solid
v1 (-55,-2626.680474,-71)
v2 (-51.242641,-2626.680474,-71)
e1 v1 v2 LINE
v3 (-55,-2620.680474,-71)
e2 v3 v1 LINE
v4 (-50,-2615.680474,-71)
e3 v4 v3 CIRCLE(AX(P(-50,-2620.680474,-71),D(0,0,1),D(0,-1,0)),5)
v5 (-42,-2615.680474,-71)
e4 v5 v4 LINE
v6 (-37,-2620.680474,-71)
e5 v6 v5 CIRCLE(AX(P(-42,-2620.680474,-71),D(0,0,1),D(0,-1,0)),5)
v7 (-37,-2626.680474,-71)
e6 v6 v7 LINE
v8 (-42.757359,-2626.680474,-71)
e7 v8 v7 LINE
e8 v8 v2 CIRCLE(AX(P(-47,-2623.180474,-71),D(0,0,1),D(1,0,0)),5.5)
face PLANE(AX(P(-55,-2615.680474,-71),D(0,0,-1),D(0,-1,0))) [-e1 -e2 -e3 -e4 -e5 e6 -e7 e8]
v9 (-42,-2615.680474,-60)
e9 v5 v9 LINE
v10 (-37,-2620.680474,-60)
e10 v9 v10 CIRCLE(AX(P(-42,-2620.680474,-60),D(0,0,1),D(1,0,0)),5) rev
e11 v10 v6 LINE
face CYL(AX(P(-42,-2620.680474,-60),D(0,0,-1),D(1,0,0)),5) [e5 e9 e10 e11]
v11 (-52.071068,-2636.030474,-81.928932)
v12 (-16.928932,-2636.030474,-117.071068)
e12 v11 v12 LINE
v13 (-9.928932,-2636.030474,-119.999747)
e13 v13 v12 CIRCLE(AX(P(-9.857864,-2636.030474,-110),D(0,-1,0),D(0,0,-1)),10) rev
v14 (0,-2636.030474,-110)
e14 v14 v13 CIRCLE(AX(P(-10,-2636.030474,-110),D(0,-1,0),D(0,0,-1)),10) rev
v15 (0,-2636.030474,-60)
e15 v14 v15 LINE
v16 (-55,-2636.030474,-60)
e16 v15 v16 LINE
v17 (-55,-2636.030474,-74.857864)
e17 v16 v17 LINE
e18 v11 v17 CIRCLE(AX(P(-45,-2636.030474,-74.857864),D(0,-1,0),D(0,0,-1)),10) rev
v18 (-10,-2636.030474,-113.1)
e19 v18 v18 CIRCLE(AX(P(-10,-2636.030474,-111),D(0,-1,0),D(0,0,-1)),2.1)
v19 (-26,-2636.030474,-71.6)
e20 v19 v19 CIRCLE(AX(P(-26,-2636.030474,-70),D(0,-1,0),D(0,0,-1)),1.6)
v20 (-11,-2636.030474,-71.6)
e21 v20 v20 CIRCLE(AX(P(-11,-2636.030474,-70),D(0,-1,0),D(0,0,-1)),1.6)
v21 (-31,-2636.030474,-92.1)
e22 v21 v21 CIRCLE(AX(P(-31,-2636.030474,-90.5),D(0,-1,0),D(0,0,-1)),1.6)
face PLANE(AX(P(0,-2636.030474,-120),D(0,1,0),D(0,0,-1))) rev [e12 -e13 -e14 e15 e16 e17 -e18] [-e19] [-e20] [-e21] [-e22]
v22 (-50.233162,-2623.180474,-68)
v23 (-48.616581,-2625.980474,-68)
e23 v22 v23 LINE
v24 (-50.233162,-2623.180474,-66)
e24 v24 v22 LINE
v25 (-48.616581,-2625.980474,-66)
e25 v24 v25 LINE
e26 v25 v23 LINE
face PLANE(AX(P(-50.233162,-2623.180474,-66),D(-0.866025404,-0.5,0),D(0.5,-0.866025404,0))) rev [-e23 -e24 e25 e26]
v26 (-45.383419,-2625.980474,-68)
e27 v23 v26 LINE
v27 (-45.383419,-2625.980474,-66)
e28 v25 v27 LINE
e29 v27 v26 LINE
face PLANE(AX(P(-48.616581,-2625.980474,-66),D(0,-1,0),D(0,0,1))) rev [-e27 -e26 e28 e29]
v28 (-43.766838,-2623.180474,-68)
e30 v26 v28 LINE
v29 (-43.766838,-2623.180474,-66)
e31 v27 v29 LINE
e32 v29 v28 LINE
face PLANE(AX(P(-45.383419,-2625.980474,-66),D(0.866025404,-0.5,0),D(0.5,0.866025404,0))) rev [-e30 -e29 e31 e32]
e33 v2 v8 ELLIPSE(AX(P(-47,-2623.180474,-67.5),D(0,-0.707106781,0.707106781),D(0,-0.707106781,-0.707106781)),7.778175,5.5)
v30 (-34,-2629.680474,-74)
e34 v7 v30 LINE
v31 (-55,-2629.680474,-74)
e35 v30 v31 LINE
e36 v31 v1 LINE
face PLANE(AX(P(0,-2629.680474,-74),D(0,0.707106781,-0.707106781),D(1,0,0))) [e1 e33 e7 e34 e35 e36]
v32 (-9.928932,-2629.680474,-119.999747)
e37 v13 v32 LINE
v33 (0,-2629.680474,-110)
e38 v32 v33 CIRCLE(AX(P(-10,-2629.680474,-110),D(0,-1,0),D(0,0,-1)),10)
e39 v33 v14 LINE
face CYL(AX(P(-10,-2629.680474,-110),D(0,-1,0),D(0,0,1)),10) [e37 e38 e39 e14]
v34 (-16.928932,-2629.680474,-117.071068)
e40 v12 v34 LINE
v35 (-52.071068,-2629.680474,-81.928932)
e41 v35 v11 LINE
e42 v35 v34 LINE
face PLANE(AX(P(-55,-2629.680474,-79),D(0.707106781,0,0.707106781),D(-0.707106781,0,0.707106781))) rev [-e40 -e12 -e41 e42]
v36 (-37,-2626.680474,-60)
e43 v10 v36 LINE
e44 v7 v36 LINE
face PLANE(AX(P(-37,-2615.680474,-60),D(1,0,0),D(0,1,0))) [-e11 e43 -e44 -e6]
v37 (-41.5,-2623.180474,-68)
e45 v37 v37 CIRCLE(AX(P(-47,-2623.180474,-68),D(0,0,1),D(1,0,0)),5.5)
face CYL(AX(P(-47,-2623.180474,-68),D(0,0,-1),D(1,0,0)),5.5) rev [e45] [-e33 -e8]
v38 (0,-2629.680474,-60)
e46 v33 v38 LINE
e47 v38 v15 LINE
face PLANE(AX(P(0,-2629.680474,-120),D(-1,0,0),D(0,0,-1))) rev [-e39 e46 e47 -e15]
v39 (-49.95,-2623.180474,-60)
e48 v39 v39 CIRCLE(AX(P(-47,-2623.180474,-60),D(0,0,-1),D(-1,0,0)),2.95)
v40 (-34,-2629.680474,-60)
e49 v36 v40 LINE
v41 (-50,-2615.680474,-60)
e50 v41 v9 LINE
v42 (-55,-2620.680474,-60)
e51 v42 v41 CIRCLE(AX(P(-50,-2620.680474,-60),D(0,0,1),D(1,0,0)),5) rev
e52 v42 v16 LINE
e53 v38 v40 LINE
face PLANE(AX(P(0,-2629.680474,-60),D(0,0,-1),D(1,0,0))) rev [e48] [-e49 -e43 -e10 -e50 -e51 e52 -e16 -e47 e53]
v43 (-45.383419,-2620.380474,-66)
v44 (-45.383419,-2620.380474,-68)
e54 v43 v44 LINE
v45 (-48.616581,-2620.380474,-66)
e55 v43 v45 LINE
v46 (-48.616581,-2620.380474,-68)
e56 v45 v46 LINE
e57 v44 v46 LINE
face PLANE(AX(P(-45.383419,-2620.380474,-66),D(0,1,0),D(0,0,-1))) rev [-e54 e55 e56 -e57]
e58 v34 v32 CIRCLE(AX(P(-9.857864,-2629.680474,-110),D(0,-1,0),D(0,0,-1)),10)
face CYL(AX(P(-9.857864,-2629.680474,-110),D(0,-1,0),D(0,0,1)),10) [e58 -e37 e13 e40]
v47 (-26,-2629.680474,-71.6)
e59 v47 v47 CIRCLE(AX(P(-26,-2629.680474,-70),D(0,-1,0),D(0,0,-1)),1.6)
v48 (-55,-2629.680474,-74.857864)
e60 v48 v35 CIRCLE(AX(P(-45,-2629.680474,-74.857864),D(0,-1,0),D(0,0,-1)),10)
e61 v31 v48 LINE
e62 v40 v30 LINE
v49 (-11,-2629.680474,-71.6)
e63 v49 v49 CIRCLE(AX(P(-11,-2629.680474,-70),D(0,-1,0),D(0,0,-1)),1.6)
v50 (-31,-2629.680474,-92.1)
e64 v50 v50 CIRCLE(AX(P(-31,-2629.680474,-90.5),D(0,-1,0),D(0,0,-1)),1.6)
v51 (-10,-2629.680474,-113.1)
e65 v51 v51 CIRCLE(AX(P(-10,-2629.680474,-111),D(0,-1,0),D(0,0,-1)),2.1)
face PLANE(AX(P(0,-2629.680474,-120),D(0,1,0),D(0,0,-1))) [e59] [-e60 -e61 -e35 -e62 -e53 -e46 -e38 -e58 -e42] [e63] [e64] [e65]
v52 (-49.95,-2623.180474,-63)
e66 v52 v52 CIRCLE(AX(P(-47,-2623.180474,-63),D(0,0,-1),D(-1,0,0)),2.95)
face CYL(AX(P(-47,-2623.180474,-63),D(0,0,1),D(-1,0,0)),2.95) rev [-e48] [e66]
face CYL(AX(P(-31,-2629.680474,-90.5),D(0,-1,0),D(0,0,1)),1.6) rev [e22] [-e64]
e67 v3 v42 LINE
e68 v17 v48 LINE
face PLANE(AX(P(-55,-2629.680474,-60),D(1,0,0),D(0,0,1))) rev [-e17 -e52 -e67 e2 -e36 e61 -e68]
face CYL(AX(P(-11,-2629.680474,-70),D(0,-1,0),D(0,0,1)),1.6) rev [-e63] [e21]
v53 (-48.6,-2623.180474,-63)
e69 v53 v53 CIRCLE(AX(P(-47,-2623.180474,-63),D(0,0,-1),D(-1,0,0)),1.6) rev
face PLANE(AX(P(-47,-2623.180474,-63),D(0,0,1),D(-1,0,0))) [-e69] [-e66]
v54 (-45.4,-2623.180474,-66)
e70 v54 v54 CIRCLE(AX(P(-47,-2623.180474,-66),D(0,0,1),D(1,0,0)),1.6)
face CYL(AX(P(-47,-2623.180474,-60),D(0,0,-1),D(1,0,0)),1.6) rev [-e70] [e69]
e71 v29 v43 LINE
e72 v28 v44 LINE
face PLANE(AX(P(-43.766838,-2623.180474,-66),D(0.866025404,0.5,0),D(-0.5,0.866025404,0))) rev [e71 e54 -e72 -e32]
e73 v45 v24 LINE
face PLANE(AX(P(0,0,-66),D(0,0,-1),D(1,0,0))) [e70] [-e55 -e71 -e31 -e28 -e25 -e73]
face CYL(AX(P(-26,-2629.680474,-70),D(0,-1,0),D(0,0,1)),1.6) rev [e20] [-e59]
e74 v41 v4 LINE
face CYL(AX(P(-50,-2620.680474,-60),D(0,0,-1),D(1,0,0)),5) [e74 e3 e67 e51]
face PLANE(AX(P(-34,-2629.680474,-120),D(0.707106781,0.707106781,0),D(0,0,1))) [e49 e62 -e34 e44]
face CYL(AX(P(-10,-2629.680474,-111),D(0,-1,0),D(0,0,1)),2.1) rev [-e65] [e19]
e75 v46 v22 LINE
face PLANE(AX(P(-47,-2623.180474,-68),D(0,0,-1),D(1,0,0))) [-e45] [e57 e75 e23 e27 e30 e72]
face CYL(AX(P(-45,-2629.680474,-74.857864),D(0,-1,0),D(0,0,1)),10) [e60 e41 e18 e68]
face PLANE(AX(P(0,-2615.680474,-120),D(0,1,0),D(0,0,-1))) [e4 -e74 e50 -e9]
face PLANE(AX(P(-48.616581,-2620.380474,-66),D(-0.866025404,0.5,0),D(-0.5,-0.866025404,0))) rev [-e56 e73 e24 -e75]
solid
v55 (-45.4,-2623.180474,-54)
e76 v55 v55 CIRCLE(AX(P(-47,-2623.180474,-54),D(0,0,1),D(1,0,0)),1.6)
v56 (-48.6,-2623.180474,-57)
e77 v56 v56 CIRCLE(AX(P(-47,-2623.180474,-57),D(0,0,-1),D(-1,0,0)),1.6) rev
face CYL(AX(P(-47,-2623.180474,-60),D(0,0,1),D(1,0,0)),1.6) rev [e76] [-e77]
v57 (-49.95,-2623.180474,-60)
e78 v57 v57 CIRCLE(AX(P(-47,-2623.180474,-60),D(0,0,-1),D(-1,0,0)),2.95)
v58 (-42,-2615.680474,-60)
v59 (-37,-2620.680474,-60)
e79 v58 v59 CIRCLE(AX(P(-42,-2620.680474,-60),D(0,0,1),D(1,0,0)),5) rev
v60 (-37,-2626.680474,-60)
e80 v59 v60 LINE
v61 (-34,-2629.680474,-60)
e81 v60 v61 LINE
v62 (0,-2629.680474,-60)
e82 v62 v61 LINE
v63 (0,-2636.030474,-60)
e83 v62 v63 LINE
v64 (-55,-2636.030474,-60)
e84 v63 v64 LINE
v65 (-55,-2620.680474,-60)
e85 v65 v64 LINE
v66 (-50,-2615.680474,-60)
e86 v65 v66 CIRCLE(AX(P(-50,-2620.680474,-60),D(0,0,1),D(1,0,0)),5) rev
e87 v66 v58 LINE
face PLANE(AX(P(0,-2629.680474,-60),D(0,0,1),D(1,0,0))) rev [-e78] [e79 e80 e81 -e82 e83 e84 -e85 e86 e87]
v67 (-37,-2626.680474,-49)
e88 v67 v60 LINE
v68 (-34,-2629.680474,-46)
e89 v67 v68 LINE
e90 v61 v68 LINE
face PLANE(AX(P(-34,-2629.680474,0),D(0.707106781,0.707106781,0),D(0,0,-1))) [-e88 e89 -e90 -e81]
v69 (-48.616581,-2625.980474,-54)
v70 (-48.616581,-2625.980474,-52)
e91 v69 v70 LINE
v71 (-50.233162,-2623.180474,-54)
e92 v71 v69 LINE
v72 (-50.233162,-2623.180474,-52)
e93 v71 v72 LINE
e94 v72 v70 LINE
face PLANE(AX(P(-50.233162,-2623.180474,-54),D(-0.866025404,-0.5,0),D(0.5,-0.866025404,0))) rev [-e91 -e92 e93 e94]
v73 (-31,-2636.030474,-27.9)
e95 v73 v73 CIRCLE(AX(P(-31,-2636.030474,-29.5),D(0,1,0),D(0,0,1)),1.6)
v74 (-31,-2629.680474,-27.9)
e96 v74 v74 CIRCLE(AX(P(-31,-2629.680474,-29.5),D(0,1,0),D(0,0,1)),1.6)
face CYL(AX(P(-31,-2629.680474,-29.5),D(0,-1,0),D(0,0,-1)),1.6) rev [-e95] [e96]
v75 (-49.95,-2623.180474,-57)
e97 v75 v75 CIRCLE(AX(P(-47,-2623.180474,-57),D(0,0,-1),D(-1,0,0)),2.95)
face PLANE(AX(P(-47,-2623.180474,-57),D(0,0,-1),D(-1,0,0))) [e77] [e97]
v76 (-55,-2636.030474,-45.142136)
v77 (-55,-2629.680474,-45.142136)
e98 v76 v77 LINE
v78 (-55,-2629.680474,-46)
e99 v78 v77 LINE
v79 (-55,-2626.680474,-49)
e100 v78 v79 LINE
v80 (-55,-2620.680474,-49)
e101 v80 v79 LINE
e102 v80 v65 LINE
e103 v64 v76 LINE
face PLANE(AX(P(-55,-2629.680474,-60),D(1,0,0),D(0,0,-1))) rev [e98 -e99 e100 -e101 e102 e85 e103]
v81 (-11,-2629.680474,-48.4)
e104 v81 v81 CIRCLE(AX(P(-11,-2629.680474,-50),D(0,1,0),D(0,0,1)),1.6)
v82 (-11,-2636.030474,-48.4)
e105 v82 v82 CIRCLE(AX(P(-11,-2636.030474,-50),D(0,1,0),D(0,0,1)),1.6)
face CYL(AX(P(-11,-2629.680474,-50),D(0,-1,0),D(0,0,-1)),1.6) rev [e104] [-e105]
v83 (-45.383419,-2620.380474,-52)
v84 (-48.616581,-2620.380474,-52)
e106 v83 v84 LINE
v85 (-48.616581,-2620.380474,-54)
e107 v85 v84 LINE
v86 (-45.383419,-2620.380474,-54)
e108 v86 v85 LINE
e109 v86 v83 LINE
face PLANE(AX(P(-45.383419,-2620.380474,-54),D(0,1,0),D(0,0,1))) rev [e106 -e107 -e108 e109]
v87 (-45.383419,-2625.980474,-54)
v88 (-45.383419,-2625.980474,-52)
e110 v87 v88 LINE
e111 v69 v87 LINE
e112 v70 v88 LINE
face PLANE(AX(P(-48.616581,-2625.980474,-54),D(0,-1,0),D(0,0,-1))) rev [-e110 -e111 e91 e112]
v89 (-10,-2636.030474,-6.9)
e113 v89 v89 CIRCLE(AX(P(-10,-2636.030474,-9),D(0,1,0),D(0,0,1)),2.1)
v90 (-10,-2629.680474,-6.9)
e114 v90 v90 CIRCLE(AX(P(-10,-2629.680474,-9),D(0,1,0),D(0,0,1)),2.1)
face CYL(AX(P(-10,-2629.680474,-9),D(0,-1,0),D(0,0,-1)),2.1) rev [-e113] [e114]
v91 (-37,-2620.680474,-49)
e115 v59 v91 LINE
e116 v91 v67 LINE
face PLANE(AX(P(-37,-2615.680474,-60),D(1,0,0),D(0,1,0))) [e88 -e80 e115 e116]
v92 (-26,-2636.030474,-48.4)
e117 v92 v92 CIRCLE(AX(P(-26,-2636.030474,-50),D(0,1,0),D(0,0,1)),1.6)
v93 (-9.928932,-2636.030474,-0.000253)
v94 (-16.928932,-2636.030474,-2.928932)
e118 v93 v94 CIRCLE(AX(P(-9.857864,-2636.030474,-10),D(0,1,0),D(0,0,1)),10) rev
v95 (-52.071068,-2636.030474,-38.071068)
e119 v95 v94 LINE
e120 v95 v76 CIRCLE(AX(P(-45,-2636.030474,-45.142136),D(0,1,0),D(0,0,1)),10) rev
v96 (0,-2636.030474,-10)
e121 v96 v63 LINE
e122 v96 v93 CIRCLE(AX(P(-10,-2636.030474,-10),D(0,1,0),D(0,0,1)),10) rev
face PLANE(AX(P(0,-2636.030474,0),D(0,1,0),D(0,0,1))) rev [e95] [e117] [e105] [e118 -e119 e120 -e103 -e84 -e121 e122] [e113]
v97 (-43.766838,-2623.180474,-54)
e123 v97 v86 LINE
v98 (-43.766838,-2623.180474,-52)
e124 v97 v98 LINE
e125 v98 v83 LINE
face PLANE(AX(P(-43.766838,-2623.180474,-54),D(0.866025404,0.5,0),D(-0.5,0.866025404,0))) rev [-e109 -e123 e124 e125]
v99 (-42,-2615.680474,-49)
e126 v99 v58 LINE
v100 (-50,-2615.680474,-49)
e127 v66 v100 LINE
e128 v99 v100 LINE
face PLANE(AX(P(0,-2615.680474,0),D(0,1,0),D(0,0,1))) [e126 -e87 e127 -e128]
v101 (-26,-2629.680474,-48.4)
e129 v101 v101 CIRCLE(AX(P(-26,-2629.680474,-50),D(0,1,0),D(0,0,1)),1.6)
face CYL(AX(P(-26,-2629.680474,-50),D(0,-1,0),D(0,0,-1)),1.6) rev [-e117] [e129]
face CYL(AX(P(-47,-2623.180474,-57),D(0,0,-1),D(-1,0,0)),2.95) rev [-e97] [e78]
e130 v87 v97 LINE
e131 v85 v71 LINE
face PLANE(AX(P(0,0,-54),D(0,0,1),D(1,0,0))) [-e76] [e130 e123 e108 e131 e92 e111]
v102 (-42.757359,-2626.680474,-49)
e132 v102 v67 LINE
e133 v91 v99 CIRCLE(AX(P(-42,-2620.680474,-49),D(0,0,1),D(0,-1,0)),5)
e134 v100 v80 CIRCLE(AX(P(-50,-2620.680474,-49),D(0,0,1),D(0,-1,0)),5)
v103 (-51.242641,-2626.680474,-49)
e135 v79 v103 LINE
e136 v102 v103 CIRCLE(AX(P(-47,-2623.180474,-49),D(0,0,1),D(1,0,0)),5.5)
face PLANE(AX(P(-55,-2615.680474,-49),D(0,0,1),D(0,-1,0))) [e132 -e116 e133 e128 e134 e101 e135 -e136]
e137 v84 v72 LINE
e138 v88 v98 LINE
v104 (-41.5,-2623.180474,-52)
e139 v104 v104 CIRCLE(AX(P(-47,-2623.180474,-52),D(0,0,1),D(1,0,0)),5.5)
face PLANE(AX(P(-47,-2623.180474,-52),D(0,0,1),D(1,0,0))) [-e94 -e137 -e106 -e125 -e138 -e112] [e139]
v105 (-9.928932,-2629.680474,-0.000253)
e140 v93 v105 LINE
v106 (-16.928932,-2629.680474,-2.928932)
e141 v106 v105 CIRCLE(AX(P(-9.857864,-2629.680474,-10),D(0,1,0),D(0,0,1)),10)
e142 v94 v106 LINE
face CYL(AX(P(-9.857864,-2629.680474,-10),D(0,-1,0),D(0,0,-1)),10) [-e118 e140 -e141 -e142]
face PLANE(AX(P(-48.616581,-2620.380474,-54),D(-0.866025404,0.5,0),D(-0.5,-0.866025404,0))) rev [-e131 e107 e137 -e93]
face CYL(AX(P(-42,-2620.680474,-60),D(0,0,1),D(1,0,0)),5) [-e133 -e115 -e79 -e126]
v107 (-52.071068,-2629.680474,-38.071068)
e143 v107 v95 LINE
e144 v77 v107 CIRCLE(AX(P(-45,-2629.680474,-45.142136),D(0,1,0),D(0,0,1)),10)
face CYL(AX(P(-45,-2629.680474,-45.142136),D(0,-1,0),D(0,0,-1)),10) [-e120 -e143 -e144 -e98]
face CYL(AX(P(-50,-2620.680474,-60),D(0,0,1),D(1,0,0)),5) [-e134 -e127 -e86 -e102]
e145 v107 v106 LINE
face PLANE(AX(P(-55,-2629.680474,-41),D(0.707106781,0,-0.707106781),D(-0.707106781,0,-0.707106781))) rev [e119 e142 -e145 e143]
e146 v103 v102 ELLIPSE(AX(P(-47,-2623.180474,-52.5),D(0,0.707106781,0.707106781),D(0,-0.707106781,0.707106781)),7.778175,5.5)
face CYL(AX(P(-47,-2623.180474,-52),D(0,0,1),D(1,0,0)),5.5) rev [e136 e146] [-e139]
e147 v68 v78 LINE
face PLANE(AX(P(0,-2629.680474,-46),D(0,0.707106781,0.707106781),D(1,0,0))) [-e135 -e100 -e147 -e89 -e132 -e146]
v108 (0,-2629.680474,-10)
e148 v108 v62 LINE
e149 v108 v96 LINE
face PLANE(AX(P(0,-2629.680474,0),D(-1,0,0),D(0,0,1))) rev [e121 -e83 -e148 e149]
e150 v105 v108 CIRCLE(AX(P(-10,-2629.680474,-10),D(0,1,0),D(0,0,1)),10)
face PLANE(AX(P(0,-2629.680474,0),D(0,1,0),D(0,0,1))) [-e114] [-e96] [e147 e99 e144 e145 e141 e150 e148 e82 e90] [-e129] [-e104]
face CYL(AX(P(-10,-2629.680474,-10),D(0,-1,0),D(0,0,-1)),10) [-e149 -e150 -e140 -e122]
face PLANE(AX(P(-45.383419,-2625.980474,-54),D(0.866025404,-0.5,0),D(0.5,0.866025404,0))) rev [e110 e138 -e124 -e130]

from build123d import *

# Parameters (mm, degrees)
SKETCH1_R           = 2.1
SKETCH1_R_2         = 1.6
BOSS_EXTRUDE1_DEPTH = 6.35
SKETCH2_W           = 18
SKETCH2_H           = 11
BOSS_EXTRUDE2_DEPTH = 14
SKETCH3_R           = 5.5
CUT_EXTRUDE1_DEPTH  = 3
CHAMFER1_SIZE       = 3
FILLET2_R           = 10
FILLET3_R           = 5
CUT_EXTRUDE2_DEPTH  = 2
SKETCH5_R           = 1.6
CUT_EXTRUDE3_DEPTH  = 2638.157111638
SKETCH6_R           = 2.95
CUT_EXTRUDE4_DEPTH  = 3


with BuildPart() as part:
    # Sketch1 → Boss-Extrude1 (new body)
    with BuildSketch(Plane(origin=(251.886129178, -2636.030473787, -0.277944786), x_dir=(1, 0, 0), z_dir=(0, 1, 0))):
        Polygon((-265.886129178, -0.277944786), (-251.886129178, -0.277944786), (-251.886129178, 59.722055214), (-306.886129178, 59.722055214), (-306.886129178, 40.722055214), align=None)
        with Locations(Location((-261.886129178, 8.722055214, 0), (0, 0, 270))):
            Circle(SKETCH1_R, mode=Mode.SUBTRACT)
        with Locations(Location((-282.886129178, 29.222055214, 0), (0, 0, 270))):
            Circle(SKETCH1_R_2, mode=Mode.SUBTRACT)
        with Locations(Location((-262.886129178, 49.722055214, 0), (0, 0, 270))):
            Circle(SKETCH1_R_2, mode=Mode.SUBTRACT)
        with Locations(Location((-277.886129178, 49.722055214, 0), (0, 0, 270))):
            Circle(SKETCH1_R_2, mode=Mode.SUBTRACT)
    extrude(amount=BOSS_EXTRUDE1_DEPTH)

    # Sketch2 → Boss-Extrude2 (add)
    with BuildSketch(Plane(origin=(-55, -2629.680473787, -60), x_dir=(1, 0, 0), z_dir=(0, -1, 0))):
        with Locations((9, 5.5)):
            Rectangle(SKETCH2_W, SKETCH2_H)
    extrude(amount=-BOSS_EXTRUDE2_DEPTH)

    # Sketch3 → Cut-Extrude1 (cut)
    with BuildSketch(Plane.XY.offset(-49)):
        with Locations((-47, -2623.180473787)):
            Circle(SKETCH3_R)
    extrude(amount=-CUT_EXTRUDE1_DEPTH, mode=Mode.SUBTRACT)

    # Chamfer1
    # the kernel refuses this chamfer: 3 mm, written as the material it adds along each edge
    with BuildSketch(Plane(origin=(-37, -2629.680473787, -49), x_dir=(0, -0.02749587661065579, 0.9996219169112949), z_dir=(-1, 0, 0))) as chamfer1_piece_1_section:
        Polygon((CHAMFER1_SIZE * 0.999621916911, CHAMFER1_SIZE * 0.0274958766107), (-CHAMFER1_SIZE * 0.0274958766107, CHAMFER1_SIZE * 0.999621916911), (0, 0), align=None)
    chamfer1_piece_1 = extrude(amount=18, mode=Mode.PRIVATE)
    chamfer1_piece_1 = chamfer1_piece_1 - Plane(origin=(-47, -2623.180473787, -47.945016367), x_dir=(1, 0, 0), z_dir=(0, 0, 1)) * Cylinder(5.5, 48, mode=Mode.PRIVATE)
    add(chamfer1_piece_1)
    with BuildSketch(Plane(origin=(-37, -2629.680473787, -60), x_dir=(0.9996219169112948, -0.027495876610655785, 0), z_dir=(0, 0, 1))) as chamfer1_piece_2:
        Polygon((CHAMFER1_SIZE * 0.999621916911, CHAMFER1_SIZE * 0.0274958766107), (-CHAMFER1_SIZE * 0.0274958766107, CHAMFER1_SIZE * 0.999621916911), (0, 0), align=None)
    extrude(amount=11)
    with BuildSketch(Plane(origin=(-29.284951036, -2629.680473787, -49), x_dir=(0, -0.02749587661065579, 0.9996219169112949), z_dir=(-1, 0, 0))) as chamfer1_piece_3a_section:
        Polygon((CHAMFER1_SIZE * 0.999621916911, CHAMFER1_SIZE * 0.0274958766107), (-CHAMFER1_SIZE * 0.0274958766107, CHAMFER1_SIZE * 0.999621916911), (0, 0), align=None)
    chamfer1_piece_3a = extrude(amount=25.715048964, mode=Mode.PRIVATE)
    chamfer1_piece_3a = split(chamfer1_piece_3a, bisect_by=Plane(origin=(-37, -2628.691092907, -48.01061912), z_dir=(1, 0, 0)), keep=Keep.TOP, mode=Mode.PRIVATE)
    with BuildSketch(Plane(origin=(-37, -2629.680473787, -60), x_dir=(0.9996219169112948, -0.027495876610655785, 0), z_dir=(0, 0, 1))) as chamfer1_piece_3b_section:
        Polygon((CHAMFER1_SIZE * 0.999621916911, CHAMFER1_SIZE * 0.0274958766107), (-CHAMFER1_SIZE * 0.0274958766107, CHAMFER1_SIZE * 0.999621916911), (0, 0), align=None)
    chamfer1_piece_3b = extrude(amount=18.715048964, mode=Mode.PRIVATE)
    chamfer1_piece_3b = split(chamfer1_piece_3b, bisect_by=Plane(origin=(-36.01061912, -2628.691092907, -49), z_dir=(0, 0, 1)), keep=Keep.TOP, mode=Mode.PRIVATE)
    chamfer1_piece_3 = chamfer1_piece_3a & chamfer1_piece_3b
    add(chamfer1_piece_3)

    # Fillet2
    # the kernel refuses this fillet: 10 mm, written as the material it takes off along each edge
    with BuildSketch(Plane(origin=(-14, -2646.385812847, 0), x_dir=(1, 0, 0), z_dir=(0, 1, 0)), Plane(origin=(-55, -2646.385812847, -41), x_dir=(0.7071067811865518, 0, 0.7071067811865432), z_dir=(0, 1, 0))) as fillet2_piece_1:
        with BuildLine():
            CenterArc((FILLET2_R * 0.414213562373, FILLET2_R), FILLET2_R, 225, 45)
            Line((-FILLET2_R * 0.292893218813, FILLET2_R * 0.292893218813), (0, 0))
            Line((0, 0), (FILLET2_R * 0.414213562373, 0))
        make_face()
    extrude(amount=27.060678119, mode=Mode.SUBTRACT)
    with BuildSketch(Plane(origin=(0, -2661.030473787, 0), x_dir=(0, 0, -1), z_dir=(0, 1, 0))) as fillet2_piece_2:
        with BuildLine():
            CenterArc((FILLET2_R, FILLET2_R), FILLET2_R, 180, 90)
            Line((0, FILLET2_R), (0, 0))
            Line((0, 0), (FILLET2_R, 0))
        make_face()
    extrude(amount=56.35, mode=Mode.SUBTRACT)

    # Fillet3
    fillet3_edges = [part.edges().sort_by_distance(p)[0] for p in [
        (-37, -2615.680473787, -54.5),
        (-55, -2615.680473787, -54.5),
    ]]
    fillet(fillet3_edges, radius=FILLET3_R)

    # Sketch4 → Cut-Extrude2 (cut)
    with BuildSketch(Plane.XY.offset(-52)):
        Polygon((-45.383419246, -2625.980473787), (-43.766838493, -2623.180473787), (-45.383419246, -2620.380473787), (-48.616580754, -2620.380473787), (-50.233161507, -2623.180473787), (-48.616580754, -2625.980473787), align=None)
    extrude(amount=-CUT_EXTRUDE2_DEPTH, mode=Mode.SUBTRACT)

    # Sketch5 → Cut-Extrude3 (cut, through all)
    with BuildSketch(Plane.XY.offset(-54)):
        with Locations((-47, -2623.180473787)):
            Circle(SKETCH5_R)
    extrude(amount=-CUT_EXTRUDE3_DEPTH, mode=Mode.SUBTRACT)

    # Sketch6 → Cut-Extrude4 (cut)
    with BuildSketch(Plane(origin=(0, 0, -60), x_dir=(-1, 0, 0), z_dir=(0, 0, -1))):
        with Locations((47, -2623.180473787)):
            Circle(SKETCH6_R)
    extrude(amount=-CUT_EXTRUDE4_DEPTH, mode=Mode.SUBTRACT)


with BuildPart() as body_2:
    # Mirror2: mirrored copy
    add(part.part.mirror(Plane(origin=(0, -2629.680473787, -60), x_dir=(1, 0, 0), z_dir=(0, 0, 1))))


solid = Compound([part.part, body_2.part])
